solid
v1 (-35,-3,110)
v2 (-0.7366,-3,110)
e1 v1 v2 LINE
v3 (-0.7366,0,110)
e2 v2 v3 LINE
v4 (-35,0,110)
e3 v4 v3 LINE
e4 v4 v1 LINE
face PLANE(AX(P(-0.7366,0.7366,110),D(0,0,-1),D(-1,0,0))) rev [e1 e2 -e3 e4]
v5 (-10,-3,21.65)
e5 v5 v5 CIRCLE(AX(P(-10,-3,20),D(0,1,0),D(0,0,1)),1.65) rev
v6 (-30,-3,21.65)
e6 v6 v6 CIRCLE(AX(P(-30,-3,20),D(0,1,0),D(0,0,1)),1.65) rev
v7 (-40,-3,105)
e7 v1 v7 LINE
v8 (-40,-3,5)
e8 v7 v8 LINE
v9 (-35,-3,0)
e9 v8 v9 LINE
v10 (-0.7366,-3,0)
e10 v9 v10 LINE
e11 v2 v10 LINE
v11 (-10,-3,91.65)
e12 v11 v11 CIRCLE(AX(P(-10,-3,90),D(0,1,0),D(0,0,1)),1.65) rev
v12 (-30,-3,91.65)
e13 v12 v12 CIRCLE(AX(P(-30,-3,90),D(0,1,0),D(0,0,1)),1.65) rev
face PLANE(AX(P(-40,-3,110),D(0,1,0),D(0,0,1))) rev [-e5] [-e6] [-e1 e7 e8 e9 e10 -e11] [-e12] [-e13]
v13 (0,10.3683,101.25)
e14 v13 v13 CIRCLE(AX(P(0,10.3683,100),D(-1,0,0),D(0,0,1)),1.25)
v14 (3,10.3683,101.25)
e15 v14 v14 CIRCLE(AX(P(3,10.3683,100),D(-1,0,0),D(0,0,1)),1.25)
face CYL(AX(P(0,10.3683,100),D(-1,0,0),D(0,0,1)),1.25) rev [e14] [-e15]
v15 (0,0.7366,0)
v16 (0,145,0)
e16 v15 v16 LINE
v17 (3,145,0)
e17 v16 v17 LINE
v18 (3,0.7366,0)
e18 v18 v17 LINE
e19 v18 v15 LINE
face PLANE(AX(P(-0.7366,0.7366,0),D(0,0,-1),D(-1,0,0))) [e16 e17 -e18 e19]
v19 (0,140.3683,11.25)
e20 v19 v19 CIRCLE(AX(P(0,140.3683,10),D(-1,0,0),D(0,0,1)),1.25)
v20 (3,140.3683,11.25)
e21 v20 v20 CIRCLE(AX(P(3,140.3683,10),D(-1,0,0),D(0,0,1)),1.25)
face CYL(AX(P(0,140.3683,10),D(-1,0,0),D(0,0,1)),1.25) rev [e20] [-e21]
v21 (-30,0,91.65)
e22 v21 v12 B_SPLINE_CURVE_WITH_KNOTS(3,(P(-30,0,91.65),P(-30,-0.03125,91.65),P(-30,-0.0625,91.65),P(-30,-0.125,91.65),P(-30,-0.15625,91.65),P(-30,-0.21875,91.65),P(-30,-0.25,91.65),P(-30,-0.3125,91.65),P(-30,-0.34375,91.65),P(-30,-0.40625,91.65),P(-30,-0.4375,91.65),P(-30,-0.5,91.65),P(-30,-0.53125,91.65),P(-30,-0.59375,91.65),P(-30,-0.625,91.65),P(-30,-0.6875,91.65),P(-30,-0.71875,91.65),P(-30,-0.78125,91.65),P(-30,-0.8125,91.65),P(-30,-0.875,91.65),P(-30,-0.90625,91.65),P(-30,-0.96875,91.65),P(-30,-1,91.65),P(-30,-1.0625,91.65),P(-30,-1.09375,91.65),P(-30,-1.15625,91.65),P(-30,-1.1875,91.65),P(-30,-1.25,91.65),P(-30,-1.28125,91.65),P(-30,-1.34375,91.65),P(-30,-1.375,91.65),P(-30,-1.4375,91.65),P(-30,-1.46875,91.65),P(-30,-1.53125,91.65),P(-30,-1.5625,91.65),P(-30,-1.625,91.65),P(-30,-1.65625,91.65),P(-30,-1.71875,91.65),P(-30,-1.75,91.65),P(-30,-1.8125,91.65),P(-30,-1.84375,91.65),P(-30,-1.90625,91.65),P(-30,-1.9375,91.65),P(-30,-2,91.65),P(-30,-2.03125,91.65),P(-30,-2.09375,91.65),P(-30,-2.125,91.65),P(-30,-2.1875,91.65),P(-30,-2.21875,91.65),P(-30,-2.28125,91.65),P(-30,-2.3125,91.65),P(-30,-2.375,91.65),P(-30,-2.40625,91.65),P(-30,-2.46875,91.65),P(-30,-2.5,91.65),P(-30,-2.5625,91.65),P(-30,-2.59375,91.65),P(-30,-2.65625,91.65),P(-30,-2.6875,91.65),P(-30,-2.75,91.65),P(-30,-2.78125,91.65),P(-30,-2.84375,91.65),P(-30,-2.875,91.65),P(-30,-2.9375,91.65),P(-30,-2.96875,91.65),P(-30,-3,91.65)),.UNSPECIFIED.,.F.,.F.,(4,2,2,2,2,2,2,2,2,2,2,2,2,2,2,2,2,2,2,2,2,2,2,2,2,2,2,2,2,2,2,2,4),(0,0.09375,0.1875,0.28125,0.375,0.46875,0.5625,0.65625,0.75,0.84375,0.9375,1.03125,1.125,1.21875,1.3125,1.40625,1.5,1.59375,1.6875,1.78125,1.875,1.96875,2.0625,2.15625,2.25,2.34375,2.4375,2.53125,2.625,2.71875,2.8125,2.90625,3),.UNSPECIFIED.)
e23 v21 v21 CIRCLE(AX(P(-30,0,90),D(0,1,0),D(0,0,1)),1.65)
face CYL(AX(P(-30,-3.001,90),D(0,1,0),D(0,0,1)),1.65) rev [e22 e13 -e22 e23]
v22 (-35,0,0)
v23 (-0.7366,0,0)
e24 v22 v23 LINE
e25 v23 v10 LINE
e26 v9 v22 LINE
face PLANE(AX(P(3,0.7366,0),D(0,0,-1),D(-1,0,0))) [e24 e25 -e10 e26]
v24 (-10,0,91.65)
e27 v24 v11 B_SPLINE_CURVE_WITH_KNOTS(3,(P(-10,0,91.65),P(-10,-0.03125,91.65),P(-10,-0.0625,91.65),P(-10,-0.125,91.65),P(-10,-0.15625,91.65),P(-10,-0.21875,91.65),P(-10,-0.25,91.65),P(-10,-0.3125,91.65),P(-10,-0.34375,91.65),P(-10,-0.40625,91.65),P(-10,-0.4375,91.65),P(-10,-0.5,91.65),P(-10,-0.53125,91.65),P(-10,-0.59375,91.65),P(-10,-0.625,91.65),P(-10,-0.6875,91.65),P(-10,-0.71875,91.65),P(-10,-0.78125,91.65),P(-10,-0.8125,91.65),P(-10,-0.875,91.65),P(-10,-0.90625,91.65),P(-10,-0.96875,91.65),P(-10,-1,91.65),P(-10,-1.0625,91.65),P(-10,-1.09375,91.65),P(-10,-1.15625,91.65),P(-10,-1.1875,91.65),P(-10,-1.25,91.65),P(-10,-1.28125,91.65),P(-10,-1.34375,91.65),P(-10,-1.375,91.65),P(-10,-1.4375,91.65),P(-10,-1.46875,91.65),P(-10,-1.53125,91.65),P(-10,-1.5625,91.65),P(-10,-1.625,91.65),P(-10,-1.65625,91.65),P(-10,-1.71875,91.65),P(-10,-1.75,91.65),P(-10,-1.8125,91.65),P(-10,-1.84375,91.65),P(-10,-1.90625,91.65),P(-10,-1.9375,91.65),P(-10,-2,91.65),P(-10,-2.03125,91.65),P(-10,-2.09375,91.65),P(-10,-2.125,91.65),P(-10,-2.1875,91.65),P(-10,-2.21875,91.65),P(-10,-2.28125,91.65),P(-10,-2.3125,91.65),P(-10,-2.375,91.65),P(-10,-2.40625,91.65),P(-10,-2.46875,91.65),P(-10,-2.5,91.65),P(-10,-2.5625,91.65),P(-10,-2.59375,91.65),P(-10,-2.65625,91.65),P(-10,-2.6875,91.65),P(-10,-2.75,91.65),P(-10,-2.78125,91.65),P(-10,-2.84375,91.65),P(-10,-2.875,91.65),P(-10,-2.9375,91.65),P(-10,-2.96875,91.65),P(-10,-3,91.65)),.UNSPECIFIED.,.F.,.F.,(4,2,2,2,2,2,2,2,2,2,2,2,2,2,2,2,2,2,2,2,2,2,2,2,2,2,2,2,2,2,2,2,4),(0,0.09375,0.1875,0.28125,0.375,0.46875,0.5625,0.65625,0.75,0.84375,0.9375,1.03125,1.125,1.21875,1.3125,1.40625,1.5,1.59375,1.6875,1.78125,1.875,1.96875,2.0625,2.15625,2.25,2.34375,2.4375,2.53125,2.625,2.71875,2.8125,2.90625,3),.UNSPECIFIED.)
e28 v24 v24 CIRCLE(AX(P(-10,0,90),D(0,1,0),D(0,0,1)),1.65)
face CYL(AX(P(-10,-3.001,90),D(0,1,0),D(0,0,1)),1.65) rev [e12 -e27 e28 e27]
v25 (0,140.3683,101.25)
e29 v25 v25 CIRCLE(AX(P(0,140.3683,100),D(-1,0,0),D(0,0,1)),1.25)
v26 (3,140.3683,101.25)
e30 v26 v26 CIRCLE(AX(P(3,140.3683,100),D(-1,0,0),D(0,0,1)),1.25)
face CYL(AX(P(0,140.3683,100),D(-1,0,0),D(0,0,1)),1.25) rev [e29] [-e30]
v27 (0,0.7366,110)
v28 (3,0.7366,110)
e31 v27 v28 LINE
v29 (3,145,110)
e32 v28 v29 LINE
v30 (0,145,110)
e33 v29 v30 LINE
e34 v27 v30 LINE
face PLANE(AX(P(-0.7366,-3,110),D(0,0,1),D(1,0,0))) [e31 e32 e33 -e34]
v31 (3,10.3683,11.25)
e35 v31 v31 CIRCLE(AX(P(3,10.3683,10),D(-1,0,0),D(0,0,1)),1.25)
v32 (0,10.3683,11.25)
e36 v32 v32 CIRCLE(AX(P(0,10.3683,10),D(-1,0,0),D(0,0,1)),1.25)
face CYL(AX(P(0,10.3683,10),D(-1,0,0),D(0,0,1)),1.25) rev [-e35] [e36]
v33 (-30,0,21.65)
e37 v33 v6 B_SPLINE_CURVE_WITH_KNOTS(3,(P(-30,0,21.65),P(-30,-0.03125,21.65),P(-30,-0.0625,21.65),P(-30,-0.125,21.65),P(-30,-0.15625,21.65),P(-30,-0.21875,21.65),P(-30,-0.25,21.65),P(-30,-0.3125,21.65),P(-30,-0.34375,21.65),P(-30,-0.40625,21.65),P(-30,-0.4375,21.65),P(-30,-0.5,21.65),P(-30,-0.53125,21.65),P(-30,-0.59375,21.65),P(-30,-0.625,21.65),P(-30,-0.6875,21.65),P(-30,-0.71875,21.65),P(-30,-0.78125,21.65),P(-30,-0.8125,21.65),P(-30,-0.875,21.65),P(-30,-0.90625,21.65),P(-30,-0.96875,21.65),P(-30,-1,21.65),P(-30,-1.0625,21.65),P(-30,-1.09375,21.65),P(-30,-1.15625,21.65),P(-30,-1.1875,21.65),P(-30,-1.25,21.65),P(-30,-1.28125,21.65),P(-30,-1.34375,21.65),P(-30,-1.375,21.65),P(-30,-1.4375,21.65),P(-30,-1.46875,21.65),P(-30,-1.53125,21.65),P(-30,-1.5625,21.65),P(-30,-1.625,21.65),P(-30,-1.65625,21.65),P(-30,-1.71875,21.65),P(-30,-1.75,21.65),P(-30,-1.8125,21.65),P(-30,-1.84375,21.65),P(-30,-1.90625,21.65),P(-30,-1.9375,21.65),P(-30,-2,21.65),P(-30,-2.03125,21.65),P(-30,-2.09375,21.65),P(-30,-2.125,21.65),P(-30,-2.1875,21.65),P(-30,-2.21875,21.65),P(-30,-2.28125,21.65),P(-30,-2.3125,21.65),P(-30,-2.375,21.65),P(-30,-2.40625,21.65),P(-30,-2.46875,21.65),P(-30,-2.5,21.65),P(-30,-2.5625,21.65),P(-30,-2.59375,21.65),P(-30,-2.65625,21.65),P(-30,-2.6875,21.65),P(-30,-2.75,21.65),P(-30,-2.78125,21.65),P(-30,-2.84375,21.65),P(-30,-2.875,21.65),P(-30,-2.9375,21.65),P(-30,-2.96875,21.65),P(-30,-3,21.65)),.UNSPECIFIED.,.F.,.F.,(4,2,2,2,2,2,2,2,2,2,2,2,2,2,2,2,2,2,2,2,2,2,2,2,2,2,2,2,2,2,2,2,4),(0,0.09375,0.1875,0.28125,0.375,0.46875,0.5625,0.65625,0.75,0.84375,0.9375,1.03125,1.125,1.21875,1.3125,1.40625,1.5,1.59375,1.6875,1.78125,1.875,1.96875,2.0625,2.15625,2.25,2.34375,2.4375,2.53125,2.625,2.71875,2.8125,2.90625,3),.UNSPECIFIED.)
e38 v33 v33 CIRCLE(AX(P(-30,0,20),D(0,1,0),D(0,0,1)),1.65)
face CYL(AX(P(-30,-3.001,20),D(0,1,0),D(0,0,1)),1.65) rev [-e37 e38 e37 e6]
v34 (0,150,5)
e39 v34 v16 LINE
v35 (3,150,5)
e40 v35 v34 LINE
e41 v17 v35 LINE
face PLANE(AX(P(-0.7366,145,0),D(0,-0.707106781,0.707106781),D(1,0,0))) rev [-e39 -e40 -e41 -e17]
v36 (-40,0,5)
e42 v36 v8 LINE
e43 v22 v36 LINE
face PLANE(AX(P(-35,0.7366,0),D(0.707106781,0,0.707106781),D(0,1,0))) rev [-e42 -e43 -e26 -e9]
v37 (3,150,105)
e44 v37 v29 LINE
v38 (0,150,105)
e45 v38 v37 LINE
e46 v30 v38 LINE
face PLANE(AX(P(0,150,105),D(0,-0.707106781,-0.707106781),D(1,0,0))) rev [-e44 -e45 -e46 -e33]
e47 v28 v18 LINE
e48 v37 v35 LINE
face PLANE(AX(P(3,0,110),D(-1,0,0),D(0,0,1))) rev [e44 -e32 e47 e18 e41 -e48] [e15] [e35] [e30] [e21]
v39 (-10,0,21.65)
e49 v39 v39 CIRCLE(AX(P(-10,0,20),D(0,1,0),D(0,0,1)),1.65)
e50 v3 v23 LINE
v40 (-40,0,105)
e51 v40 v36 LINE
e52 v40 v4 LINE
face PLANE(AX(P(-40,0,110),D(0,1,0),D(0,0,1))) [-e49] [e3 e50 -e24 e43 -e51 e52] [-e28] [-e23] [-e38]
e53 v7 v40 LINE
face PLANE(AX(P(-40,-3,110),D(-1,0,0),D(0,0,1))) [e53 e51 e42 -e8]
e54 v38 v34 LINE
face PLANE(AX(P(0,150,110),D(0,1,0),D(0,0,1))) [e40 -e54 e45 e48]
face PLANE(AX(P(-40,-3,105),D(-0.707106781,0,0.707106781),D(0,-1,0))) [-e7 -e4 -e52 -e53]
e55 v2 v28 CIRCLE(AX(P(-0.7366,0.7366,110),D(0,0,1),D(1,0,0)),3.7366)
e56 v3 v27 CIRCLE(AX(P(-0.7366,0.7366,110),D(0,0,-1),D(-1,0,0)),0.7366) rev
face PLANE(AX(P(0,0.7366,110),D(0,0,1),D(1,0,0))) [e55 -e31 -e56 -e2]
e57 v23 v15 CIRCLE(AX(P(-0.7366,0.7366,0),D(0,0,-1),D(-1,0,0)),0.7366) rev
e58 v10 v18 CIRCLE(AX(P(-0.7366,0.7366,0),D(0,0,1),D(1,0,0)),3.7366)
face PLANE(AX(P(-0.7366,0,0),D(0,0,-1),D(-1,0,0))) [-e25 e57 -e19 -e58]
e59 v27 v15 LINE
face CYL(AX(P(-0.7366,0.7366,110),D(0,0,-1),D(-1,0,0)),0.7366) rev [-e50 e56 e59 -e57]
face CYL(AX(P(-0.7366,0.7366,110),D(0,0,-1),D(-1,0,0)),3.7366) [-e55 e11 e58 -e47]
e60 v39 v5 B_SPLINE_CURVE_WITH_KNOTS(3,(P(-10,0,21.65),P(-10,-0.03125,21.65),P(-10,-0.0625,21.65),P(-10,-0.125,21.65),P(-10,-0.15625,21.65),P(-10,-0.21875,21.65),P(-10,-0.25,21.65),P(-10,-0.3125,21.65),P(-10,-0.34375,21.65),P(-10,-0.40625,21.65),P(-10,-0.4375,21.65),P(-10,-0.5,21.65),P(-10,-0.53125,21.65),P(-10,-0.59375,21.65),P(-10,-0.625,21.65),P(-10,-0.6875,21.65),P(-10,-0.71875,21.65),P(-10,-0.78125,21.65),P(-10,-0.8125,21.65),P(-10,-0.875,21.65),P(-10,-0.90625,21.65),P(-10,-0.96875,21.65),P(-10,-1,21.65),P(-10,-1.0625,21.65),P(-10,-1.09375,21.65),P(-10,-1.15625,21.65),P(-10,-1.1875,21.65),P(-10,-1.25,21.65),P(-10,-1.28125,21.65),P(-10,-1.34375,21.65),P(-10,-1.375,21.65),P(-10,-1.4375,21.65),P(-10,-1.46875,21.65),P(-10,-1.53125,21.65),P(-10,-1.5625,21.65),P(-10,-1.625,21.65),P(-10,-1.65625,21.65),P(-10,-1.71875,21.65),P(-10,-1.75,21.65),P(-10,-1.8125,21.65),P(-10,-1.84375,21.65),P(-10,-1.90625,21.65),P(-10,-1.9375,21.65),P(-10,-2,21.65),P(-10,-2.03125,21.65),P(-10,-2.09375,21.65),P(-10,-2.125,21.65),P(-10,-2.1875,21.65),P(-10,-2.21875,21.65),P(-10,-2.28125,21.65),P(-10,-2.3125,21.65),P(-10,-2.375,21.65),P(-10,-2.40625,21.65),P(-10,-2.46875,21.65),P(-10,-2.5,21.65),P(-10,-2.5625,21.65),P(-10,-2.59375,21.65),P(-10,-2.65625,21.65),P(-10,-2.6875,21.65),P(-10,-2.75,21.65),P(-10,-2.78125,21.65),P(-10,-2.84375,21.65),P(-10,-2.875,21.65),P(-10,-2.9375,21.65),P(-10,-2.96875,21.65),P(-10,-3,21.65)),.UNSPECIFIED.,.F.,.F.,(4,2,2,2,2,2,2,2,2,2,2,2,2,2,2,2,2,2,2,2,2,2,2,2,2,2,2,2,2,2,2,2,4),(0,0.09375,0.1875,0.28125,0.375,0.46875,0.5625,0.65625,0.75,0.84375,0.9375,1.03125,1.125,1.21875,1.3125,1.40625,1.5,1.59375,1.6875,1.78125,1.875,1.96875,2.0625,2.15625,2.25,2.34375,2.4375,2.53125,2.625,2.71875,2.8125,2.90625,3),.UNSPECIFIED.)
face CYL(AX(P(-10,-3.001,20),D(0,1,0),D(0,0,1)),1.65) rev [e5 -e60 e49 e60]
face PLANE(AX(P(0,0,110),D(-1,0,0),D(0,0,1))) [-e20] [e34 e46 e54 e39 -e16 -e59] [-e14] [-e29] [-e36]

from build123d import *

# Parameters (mm, degrees)
SM_BASE_FLANGE_1_DEPTH = 110
M3X0_5_1_D             = 2.5
M3X0_5_1_DEPTH         = 8.5
M3X0_5_1_TIP           = 0.751075774
CHAMFER_1_SIZE         = 5
CUT_EXTRUDE_1_REACH    = 192.263
SKETCH_8_R             = 1.65


# Sheet-metal steps are written as plain solids
with BuildPart() as part:
    # Sketch 1 → 基材-凸緣1 (new body)
    with BuildSketch(Plane.XY):
        with BuildLine():
            Line((-40, 0), (-0.7366, 0))
            ThreePointArc((-0.7366, 0), (-0.215745145, 0.215745145), (0, 0.7366))
            Line((0, 0.7366), (0, 150))
            Line((0, 150), (3, 150))
            Line((3, 150), (3, 0.7366))
            ThreePointArc((3, 0.7366), (1.905575199, -1.905575199), (-0.7366, -3))
            Line((-0.7366, -3), (-40, -3))
            Line((-40, -3), (-40, 0))
        make_face()
    extrude(amount=SM_BASE_FLANGE_1_DEPTH)

    # M3x0.5 螺紋孔1
    with Locations(Plane.ZY):
        with Locations((10, 140.3683), (100, 140.3683), (100, 10.3683), (10, 10.3683)):
            Hole(M3X0_5_1_D / 2, depth=M3X0_5_1_DEPTH)
            with Locations((0, 0, -(M3X0_5_1_DEPTH + M3X0_5_1_TIP / 2))):  # 118° drill point
                Cone(0, M3X0_5_1_D / 2, M3X0_5_1_TIP, mode=Mode.SUBTRACT)

    # 導角1
    chamfer_1_edges = [part.edges().sort_by_distance(p)[0] for p in [
        (-40, -1.5, 110),
        (-40, -1.5, 0),
        (1.5, 150, 110),
        (1.5, 150, 0),
    ]]
    chamfer(chamfer_1_edges, length=CHAMFER_1_SIZE)

    # 草圖8 → 除料-伸長1 (cut, up to next)
    with BuildSketch(Plane(origin=(0, 0, 0), x_dir=(1, 0, 0), z_dir=(0, 1, 0)), mode=Mode.PRIVATE) as cut_extrude_1_sk1:
        with Locations(Location((-10, -20, 0), (0, 0, 270))):
            Circle(SKETCH_8_R)
    cut_extrude_1_tool1 = extrude(cut_extrude_1_sk1.sketch, amount=-CUT_EXTRUDE_1_REACH, mode=Mode.PRIVATE) & part.part
    # 草圖8 → 除料-伸長1 (cut, up to next)
    with BuildSketch(Plane(origin=(0, 0, 0), x_dir=(1, 0, 0), z_dir=(0, 1, 0)), mode=Mode.PRIVATE) as cut_extrude_1_sk2:
        with Locations(Location((-10, -90, 0), (0, 0, 270))):
            Circle(SKETCH_8_R)
    cut_extrude_1_tool2 = extrude(cut_extrude_1_sk2.sketch, amount=-CUT_EXTRUDE_1_REACH, mode=Mode.PRIVATE) & part.part
    # 草圖8 → 除料-伸長1 (cut, up to next)
    with BuildSketch(Plane(origin=(0, 0, 0), x_dir=(1, 0, 0), z_dir=(0, 1, 0)), mode=Mode.PRIVATE) as cut_extrude_1_sk3:
        with Locations(Location((-30, -90, 0), (0, 0, 270))):
            Circle(SKETCH_8_R)
    cut_extrude_1_tool3 = extrude(cut_extrude_1_sk3.sketch, amount=-CUT_EXTRUDE_1_REACH, mode=Mode.PRIVATE) & part.part
    # 草圖8 → 除料-伸長1 (cut, up to next)
    with BuildSketch(Plane(origin=(0, 0, 0), x_dir=(1, 0, 0), z_dir=(0, 1, 0)), mode=Mode.PRIVATE) as cut_extrude_1_sk4:
        with Locations(Location((-30, -20, 0), (0, 0, 270))):
            Circle(SKETCH_8_R)
    cut_extrude_1_tool4 = extrude(cut_extrude_1_sk4.sketch, amount=-CUT_EXTRUDE_1_REACH, mode=Mode.PRIVATE) & part.part
    add(cut_extrude_1_tool1.solids().sort_by_distance((-10, 0, 20))[0], mode=Mode.SUBTRACT)
    add(cut_extrude_1_tool2.solids().sort_by_distance((-10, 0, 90))[0], mode=Mode.SUBTRACT)
    add(cut_extrude_1_tool3.solids().sort_by_distance((-30, 0, 90))[0], mode=Mode.SUBTRACT)
    add(cut_extrude_1_tool4.solids().sort_by_distance((-30, 0, 20))[0], mode=Mode.SUBTRACT)


solid = part.part
